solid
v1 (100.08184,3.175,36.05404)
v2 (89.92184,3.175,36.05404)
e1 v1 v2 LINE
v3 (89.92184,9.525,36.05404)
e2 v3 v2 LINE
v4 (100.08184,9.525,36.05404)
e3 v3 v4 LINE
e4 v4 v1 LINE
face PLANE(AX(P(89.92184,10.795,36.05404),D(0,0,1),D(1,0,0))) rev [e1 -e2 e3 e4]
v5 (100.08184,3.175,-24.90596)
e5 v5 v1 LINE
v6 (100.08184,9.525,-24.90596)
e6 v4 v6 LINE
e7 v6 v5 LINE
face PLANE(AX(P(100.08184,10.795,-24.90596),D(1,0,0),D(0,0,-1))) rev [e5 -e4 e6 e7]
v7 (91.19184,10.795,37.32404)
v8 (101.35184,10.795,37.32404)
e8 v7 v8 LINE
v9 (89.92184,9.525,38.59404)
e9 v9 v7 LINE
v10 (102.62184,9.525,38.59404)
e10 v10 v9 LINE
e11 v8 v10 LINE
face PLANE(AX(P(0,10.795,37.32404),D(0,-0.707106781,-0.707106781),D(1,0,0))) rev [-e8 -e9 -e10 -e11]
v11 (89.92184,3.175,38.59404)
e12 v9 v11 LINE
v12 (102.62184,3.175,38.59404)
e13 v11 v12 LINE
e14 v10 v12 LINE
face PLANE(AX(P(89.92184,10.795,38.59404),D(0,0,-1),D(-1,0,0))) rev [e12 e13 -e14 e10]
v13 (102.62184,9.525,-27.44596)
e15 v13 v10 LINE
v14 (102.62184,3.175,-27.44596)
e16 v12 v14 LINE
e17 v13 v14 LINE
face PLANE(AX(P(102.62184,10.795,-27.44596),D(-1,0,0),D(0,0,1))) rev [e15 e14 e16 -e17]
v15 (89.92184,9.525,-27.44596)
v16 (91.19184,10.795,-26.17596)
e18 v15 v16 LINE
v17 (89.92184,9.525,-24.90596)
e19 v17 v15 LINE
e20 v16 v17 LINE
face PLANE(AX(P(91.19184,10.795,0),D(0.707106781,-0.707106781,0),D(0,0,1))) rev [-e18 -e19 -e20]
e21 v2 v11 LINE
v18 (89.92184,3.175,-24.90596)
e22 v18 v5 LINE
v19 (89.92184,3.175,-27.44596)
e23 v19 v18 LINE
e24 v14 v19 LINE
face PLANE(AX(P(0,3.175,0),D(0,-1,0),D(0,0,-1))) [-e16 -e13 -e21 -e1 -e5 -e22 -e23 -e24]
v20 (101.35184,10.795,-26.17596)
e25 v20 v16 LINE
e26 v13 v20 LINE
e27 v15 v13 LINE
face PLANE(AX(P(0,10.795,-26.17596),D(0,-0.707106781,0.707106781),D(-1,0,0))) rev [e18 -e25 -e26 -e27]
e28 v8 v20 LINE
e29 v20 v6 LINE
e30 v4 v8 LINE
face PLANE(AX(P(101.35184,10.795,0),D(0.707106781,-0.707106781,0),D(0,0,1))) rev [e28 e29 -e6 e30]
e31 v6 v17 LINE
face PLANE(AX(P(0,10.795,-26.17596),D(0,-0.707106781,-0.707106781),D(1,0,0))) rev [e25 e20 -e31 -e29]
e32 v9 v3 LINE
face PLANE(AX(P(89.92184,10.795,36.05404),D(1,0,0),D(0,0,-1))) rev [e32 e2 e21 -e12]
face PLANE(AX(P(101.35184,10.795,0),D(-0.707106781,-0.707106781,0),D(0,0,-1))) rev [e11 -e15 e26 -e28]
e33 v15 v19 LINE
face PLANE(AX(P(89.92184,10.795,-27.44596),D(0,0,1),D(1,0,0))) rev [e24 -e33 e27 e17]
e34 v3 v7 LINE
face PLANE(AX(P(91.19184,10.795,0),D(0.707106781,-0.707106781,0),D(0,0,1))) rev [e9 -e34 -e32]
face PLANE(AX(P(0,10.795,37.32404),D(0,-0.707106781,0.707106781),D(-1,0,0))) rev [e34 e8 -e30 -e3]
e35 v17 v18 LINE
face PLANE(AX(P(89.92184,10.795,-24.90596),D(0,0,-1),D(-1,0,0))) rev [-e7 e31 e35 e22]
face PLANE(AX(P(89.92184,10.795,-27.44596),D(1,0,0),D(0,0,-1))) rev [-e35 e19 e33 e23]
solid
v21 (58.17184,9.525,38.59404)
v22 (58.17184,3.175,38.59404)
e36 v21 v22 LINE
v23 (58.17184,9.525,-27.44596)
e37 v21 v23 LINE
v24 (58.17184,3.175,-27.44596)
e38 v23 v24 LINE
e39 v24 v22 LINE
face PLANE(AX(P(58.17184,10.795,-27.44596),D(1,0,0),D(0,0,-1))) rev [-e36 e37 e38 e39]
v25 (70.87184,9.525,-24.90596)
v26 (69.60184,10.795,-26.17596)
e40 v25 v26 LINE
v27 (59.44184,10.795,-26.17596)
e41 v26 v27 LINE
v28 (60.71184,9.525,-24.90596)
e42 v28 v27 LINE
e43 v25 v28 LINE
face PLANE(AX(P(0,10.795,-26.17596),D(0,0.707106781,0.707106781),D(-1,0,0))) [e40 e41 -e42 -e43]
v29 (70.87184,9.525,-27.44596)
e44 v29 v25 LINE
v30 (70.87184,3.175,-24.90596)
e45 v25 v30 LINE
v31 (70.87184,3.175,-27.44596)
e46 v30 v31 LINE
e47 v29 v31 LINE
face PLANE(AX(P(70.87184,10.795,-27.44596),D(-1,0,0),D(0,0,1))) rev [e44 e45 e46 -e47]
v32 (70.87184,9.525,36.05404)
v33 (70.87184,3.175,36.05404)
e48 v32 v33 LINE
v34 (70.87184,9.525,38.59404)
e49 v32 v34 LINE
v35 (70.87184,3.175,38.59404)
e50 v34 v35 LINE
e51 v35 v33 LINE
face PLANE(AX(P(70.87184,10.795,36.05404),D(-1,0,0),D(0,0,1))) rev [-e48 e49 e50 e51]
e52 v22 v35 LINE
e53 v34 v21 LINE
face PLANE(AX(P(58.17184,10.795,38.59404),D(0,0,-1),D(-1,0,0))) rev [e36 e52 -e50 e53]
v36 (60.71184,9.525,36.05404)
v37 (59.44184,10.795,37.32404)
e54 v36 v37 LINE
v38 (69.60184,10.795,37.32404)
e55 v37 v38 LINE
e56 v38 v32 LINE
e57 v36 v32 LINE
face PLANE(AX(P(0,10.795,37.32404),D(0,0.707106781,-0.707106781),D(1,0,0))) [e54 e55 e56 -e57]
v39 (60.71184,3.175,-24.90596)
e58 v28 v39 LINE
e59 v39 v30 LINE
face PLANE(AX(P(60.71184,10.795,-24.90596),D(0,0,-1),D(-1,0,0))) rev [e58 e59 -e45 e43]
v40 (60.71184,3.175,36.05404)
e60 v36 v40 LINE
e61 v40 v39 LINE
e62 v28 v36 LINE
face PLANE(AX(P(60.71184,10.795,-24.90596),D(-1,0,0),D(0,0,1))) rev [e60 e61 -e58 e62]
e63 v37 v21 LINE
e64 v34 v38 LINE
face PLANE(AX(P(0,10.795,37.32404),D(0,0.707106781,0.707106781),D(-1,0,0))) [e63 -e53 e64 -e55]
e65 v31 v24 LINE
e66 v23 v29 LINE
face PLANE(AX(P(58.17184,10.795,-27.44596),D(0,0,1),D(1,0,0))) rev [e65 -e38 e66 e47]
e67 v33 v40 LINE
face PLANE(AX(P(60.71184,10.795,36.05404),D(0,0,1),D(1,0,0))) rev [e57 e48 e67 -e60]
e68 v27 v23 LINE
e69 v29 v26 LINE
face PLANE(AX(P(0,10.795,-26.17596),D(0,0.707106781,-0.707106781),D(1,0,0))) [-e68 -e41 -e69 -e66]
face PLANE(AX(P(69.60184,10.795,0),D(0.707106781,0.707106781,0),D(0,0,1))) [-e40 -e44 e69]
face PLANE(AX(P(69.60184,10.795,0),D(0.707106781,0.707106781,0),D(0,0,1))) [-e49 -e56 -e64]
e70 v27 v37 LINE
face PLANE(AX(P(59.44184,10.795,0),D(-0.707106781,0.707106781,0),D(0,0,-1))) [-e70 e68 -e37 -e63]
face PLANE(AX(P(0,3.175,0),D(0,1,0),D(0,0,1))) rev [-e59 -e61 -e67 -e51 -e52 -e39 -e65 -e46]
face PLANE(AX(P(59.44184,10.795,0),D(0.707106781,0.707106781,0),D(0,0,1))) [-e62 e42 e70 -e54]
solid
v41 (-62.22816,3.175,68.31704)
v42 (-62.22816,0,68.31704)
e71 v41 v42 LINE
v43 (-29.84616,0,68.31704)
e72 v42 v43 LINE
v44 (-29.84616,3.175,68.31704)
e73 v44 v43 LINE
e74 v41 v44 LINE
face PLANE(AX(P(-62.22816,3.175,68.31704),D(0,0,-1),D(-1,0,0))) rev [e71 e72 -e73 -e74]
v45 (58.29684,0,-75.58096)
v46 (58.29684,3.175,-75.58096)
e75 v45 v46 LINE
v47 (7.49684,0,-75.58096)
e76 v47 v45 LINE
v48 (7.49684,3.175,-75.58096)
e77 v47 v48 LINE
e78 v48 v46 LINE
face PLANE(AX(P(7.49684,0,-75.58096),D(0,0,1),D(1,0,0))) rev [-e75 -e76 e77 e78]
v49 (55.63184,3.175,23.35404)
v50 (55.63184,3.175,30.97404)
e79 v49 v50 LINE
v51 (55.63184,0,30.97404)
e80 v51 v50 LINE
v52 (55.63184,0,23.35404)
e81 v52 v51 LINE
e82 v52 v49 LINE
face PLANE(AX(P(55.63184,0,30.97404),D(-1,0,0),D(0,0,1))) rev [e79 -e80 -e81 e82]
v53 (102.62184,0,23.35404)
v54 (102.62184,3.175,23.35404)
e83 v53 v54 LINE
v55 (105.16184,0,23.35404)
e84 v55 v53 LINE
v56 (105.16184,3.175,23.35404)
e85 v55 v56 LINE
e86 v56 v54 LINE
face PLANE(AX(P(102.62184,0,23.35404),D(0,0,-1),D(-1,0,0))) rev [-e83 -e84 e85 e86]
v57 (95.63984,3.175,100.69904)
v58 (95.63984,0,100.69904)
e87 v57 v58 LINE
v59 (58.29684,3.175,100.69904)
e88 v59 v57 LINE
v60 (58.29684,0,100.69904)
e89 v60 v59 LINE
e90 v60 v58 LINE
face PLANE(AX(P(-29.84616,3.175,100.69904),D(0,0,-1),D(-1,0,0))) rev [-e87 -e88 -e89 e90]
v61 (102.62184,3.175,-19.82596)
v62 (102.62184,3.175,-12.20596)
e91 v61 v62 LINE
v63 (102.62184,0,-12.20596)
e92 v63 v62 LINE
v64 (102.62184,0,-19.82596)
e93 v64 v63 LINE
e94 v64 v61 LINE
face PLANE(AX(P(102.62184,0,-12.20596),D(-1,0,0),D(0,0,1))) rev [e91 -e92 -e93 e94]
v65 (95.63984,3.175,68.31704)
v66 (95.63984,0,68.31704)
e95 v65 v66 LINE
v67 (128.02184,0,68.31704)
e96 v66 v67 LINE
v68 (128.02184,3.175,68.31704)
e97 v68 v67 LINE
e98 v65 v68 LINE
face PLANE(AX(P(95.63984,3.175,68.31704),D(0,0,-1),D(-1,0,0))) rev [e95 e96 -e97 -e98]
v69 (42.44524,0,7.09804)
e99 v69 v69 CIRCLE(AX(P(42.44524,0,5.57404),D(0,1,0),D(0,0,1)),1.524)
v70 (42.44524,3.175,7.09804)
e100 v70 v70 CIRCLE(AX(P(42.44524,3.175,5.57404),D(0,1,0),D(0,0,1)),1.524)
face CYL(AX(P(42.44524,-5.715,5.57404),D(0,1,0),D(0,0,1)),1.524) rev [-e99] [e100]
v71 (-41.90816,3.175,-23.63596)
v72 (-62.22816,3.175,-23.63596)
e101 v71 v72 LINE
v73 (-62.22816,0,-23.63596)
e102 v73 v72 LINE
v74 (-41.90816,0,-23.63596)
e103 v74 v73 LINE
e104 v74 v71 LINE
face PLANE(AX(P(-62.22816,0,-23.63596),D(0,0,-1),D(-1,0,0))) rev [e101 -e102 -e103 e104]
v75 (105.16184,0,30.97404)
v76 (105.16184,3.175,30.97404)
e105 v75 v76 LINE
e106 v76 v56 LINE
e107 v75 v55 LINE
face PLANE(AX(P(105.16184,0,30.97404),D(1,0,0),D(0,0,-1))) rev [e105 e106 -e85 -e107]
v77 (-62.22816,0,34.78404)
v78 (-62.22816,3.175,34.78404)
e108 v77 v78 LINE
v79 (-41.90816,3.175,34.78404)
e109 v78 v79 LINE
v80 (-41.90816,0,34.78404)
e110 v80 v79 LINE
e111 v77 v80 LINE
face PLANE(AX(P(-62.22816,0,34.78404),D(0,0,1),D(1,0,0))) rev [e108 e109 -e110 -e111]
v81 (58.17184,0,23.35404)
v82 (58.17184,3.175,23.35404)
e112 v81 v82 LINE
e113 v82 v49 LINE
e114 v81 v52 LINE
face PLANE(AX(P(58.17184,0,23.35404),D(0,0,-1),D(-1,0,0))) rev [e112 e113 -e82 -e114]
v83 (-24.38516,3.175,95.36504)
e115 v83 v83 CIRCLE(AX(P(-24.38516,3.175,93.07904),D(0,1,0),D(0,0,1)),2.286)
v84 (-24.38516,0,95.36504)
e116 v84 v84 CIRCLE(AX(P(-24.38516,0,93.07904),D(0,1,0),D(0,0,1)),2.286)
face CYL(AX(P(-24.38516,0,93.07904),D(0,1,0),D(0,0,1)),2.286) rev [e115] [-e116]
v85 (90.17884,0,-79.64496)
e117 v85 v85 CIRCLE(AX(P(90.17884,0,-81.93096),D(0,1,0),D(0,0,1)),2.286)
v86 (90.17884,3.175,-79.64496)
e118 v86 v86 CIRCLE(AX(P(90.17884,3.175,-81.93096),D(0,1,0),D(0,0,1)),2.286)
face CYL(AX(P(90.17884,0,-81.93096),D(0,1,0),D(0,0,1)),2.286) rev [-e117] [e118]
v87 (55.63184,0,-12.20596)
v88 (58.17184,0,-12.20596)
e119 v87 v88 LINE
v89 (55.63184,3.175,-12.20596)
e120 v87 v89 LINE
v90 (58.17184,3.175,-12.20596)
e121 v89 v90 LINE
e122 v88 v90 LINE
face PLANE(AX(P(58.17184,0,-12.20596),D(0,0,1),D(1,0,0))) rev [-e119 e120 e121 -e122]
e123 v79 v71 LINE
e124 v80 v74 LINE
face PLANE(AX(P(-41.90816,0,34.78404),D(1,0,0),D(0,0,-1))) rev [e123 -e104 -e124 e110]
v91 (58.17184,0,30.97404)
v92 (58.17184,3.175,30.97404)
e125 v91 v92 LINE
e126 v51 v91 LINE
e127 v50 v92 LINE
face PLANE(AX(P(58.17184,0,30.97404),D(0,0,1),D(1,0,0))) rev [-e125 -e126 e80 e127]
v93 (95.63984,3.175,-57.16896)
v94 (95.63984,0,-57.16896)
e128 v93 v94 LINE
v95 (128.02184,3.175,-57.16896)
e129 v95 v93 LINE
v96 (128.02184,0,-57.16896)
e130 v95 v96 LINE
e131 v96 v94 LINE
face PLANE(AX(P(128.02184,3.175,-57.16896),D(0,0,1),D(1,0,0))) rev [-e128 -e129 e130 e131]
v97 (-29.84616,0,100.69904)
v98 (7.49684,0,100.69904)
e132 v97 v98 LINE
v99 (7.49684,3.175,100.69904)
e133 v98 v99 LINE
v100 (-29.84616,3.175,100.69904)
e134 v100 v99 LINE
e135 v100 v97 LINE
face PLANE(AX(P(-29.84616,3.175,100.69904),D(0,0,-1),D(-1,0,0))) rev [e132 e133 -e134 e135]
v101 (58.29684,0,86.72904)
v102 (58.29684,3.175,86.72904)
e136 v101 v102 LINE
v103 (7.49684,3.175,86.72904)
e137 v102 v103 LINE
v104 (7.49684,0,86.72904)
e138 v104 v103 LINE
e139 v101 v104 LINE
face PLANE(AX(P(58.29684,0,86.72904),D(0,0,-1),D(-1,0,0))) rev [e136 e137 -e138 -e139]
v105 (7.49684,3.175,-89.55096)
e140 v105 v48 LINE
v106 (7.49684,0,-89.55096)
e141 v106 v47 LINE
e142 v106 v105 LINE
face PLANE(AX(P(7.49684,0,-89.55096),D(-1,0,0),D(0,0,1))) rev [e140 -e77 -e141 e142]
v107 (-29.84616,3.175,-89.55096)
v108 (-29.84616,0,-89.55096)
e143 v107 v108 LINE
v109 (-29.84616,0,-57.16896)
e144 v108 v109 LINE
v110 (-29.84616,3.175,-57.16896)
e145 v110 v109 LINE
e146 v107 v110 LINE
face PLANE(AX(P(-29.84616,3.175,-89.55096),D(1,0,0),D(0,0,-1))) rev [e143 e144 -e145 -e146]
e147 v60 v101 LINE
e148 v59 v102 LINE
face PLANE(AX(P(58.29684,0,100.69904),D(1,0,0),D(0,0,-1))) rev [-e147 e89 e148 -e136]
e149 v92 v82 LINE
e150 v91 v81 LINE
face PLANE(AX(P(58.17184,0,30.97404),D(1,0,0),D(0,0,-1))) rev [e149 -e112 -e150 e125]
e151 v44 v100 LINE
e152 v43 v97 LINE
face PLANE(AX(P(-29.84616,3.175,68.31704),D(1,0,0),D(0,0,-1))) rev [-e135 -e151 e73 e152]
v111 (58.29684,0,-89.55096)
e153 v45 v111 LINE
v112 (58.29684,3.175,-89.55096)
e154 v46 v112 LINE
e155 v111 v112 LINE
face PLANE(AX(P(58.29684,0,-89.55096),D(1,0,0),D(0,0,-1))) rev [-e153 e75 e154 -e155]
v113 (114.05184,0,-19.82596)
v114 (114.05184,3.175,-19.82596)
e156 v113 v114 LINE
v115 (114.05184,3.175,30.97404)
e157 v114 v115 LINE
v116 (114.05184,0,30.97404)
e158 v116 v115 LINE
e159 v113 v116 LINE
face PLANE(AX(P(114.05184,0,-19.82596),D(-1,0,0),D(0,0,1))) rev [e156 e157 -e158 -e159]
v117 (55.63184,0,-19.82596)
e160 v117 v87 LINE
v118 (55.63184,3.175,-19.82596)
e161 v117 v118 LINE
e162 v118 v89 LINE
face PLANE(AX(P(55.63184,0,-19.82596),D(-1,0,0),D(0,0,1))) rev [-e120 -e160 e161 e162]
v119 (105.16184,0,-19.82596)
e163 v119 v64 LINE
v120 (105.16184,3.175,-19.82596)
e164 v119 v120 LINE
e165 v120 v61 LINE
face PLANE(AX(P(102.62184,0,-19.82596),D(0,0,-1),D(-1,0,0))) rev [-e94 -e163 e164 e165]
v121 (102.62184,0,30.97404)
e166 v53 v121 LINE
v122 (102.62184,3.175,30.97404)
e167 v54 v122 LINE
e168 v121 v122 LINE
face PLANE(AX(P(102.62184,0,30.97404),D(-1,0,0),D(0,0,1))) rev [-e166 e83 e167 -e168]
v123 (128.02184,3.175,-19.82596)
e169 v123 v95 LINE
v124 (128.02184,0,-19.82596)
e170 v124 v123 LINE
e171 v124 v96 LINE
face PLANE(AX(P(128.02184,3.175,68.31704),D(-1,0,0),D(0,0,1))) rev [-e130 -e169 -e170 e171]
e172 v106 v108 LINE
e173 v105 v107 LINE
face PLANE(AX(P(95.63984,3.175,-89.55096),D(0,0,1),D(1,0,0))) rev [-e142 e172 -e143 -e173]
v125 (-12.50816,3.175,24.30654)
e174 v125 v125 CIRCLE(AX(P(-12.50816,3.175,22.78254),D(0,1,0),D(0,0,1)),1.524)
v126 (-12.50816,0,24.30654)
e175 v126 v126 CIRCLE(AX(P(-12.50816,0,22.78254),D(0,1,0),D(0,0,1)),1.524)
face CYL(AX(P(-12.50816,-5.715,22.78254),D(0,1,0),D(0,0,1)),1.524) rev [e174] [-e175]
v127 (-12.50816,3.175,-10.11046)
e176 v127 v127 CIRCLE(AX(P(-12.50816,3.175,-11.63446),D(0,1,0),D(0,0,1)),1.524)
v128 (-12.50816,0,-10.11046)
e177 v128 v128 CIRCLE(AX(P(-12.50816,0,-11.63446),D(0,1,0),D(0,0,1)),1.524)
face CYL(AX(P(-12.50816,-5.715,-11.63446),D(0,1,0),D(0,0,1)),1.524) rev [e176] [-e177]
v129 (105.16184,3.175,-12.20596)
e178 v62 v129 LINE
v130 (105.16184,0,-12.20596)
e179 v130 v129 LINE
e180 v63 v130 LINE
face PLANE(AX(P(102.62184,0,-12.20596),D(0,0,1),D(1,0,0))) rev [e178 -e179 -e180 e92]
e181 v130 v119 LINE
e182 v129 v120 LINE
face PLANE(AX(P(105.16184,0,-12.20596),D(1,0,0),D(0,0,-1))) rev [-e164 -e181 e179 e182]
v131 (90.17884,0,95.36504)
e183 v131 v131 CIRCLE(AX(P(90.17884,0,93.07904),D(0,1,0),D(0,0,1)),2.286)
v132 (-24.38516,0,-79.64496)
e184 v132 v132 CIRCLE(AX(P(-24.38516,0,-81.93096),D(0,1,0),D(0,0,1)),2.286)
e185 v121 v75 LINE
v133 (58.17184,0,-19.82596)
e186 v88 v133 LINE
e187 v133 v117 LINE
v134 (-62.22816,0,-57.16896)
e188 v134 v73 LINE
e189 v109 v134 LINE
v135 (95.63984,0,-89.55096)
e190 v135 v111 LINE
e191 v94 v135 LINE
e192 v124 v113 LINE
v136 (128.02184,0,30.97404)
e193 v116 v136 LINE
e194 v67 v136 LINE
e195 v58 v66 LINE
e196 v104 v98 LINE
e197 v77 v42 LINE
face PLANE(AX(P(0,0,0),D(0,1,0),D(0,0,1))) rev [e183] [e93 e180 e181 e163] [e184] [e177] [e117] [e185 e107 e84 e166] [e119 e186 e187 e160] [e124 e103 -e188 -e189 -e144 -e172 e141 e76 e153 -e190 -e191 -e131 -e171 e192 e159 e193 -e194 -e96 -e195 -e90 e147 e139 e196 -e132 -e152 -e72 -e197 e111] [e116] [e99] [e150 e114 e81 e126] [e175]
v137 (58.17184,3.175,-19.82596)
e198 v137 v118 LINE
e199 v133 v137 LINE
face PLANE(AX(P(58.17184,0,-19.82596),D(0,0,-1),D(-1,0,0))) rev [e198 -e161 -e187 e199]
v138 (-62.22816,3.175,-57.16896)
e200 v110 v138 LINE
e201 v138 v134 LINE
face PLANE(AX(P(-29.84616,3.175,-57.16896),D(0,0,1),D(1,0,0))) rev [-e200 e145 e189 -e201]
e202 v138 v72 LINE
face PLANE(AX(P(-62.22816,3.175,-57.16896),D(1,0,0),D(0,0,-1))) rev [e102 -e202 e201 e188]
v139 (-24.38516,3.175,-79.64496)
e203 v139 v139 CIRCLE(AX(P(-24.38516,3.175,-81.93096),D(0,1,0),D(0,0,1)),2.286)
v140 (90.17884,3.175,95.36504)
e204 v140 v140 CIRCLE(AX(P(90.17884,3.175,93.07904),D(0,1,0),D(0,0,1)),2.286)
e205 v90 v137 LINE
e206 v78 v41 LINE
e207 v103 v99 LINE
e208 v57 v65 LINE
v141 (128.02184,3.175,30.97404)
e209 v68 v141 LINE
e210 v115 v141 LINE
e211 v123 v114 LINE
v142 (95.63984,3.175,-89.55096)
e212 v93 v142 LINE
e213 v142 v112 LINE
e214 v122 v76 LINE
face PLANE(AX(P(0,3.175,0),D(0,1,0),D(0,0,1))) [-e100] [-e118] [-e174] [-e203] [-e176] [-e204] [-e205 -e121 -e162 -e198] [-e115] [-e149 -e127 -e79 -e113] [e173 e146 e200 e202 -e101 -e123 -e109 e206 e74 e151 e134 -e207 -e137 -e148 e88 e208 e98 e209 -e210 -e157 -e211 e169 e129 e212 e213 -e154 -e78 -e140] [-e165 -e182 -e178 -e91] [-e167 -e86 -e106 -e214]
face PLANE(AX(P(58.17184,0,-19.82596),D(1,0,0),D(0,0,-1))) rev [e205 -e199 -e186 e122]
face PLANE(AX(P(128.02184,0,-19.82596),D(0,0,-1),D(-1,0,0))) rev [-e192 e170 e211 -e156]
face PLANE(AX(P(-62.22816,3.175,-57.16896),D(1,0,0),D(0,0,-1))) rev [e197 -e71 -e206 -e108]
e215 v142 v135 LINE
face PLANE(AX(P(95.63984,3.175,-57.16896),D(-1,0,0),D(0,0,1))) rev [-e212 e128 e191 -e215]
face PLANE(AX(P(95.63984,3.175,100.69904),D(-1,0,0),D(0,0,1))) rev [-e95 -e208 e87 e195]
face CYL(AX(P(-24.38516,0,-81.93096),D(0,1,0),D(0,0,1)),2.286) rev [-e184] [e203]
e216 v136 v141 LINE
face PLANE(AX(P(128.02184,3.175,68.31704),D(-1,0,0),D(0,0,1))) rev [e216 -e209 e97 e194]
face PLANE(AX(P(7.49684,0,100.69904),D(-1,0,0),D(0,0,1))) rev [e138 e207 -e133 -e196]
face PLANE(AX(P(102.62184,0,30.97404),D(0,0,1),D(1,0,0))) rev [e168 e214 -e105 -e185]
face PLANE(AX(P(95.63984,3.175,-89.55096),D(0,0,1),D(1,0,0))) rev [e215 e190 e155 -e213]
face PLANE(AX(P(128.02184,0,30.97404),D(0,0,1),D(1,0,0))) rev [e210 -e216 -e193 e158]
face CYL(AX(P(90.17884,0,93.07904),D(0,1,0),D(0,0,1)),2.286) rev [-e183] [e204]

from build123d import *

# Parameters (mm, degrees)
BOSS_EXTRUDE1_DEPTH   = 3.175
SKETCH2_R             = 2.286
CUT_EXTRUDE1_DEPTH    = 163.910922896
SKETCH3_W             = 20.32
SKETCH3_H             = 58.42
SKETCH3_W_2           = 50.8
SKETCH3_H_2           = 13.97
SKETCH3_W_3           = 13.97
SKETCH3_H_3           = 50.8
CUT_EXTRUDE2_DEPTH    = 163.910922896
BOSS_EXTRUDE2_DEPTH   = 7.62
BOSS_EXTRUDE2_2_DEPTH = 7.62
CHAMFER1_SIZE         = 1.27
CHAMFER2_SIZE         = 1.27
SKETCH5_W             = 2.54
SKETCH5_H             = 7.62
CUT_EXTRUDE3_DEPTH    = 164.058126366
SKETCH6_R             = 1.524
CUT_EXTRUDE4_DEPTH    = 8.89


with BuildPart() as part:
    # Sketch1 → Boss-Extrude1 (new body)
    with BuildSketch(Plane(origin=(0, 0, 0), x_dir=(1, 0, 0), z_dir=(0, 1, 0))):
        Polygon((-62.22816, -68.31704), (-29.84616, -68.31704), (-29.84616, -100.69904), (95.63984, -100.69904), (95.63984, -68.31704), (128.02184, -68.31704), (128.02184, 57.16896), (95.63984, 57.16896), (95.63984, 89.55096), (-29.84616, 89.55096), (-29.84616, 57.16896), (-62.22816, 57.16896), align=None)
    extrude(amount=BOSS_EXTRUDE1_DEPTH)

    # Sketch2 → Cut-Extrude1 (cut, through all)
    with BuildSketch(Plane(origin=(0, 3.175, 0), x_dir=(1, 0, 0), z_dir=(0, 1, 0))):
        with Locations(Location((-24.38516, 81.93096, 0), (0, 0, 270))):
            Circle(SKETCH2_R)
        with Locations(Location((90.17884, 81.93096, 0), (0, 0, 270))):
            Circle(SKETCH2_R)
        with Locations(Location((90.17884, -93.07904, 0), (0, 0, 270))):
            Circle(SKETCH2_R)
        with Locations(Location((-24.38516, -93.07904, 0), (0, 0, 270))):
            Circle(SKETCH2_R)
    extrude(amount=-CUT_EXTRUDE1_DEPTH, mode=Mode.SUBTRACT)

    # Sketch3 → Cut-Extrude2 (cut, through all)
    with BuildSketch(Plane(origin=(0, 3.175, 0), x_dir=(1, 0, 0), z_dir=(0, 1, 0))):
        with Locations((-52.06816, -5.57404)):
            Rectangle(SKETCH3_W, SKETCH3_H)
        with Locations((32.89684, 82.56596)):
            Rectangle(SKETCH3_W_2, SKETCH3_H_2)
        with Locations((121.03684, -5.57404)):
            Rectangle(SKETCH3_W_3, SKETCH3_H_3)
        with Locations((32.89684, -93.71404)):
            Rectangle(SKETCH3_W_2, SKETCH3_H_2)
    extrude(amount=-CUT_EXTRUDE2_DEPTH, mode=Mode.SUBTRACT)

    # Sketch5 → Cut-Extrude3 (cut, through all)
    with BuildSketch(Plane(origin=(0, 3.175, 0), x_dir=(1, 0, 0), z_dir=(0, 1, 0))):
        with Locations((56.90184, 16.01596)):
            Rectangle(SKETCH5_W, SKETCH5_H)
        with Locations((56.90184, -27.16404)):
            Rectangle(SKETCH5_W, SKETCH5_H)
        with Locations((103.89184, -27.16404)):
            Rectangle(SKETCH5_W, SKETCH5_H)
        with Locations((103.89184, 16.01596)):
            Rectangle(SKETCH5_W, SKETCH5_H)
    extrude(amount=-CUT_EXTRUDE3_DEPTH, mode=Mode.SUBTRACT)

    # Sketch6 → Cut-Extrude4 (cut)
    with BuildSketch(Plane(origin=(0, 3.175, 0), x_dir=(1, 0, 0), z_dir=(0, 1, 0))):
        with Locations(Location((42.44524, -5.57404, 0), (0, 0, 270))):
            Circle(SKETCH6_R)
        with Locations(Location((-12.50816, -22.78254, 0), (0, 0, 270))):
            Circle(SKETCH6_R)
        with Locations(Location((-12.50816, 11.63446, 0), (0, 0, 270))):
            Circle(SKETCH6_R)
    extrude(amount=-CUT_EXTRUDE4_DEPTH, mode=Mode.SUBTRACT)


with BuildPart() as body_2:
    # Sketch4 → Boss-Extrude2 (new body)
    with BuildSketch(Plane(origin=(0, 3.175, 0), x_dir=(1, 0, 0), z_dir=(0, 1, 0))):
        Polygon((60.71184, 24.90596), (70.87184, 24.90596), (70.87184, 27.44596), (58.17184, 27.44596), (58.17184, -38.59404), (70.87184, -38.59404), (70.87184, -36.05404), (60.71184, -36.05404), align=None)
    extrude(amount=BOSS_EXTRUDE2_DEPTH)

    # Chamfer1
    chamfer1_edges = [body_2.edges().sort_by_distance(p)[0] for p in [
        (70.87184, 10.795, -26.17596),
        (64.52184, 10.795, -27.44596),
        (58.17184, 10.795, 5.57404),
        (64.52184, 10.795, 38.59404),
        (70.87184, 10.795, 37.32404),
        (65.79184, 10.795, 36.05404),
        (60.71184, 10.795, 5.57404),
        (65.79184, 10.795, -24.90596),
    ]]
    chamfer(chamfer1_edges, length=CHAMFER1_SIZE - 0.0001)  # a hair under: the kernel refuses the full size


with BuildPart() as body_3:
    # Sketch4 → Boss-Extrude2 2 (new body)
    with BuildSketch(Plane(origin=(0, 3.175, 0), x_dir=(1, 0, 0), z_dir=(0, 1, 0))):
        Polygon((100.08184, 24.90596), (100.08184, -36.05404), (89.92184, -36.05404), (89.92184, -38.59404), (102.62184, -38.59404), (102.62184, 27.44596), (89.92184, 27.44596), (89.92184, 24.90596), align=None)
    extrude(amount=BOSS_EXTRUDE2_2_DEPTH)

    # Chamfer2
    chamfer2_edges = [body_3.edges().sort_by_distance(p)[0] for p in [
        (96.27184, 10.795, 38.59404),
        (102.62184, 10.795, 5.57404),
        (96.27184, 10.795, -27.44596),
        (89.92184, 10.795, -26.17596),
        (95.00184, 10.795, -24.90596),
        (100.08184, 10.795, 5.57404),
        (95.00184, 10.795, 36.05404),
        (89.92184, 10.795, 37.32404),
    ]]
    chamfer(chamfer2_edges, length=CHAMFER2_SIZE - 0.0001)  # a hair under: the kernel refuses the full size


solid = Compound([part.part, body_2.part, body_3.part])
